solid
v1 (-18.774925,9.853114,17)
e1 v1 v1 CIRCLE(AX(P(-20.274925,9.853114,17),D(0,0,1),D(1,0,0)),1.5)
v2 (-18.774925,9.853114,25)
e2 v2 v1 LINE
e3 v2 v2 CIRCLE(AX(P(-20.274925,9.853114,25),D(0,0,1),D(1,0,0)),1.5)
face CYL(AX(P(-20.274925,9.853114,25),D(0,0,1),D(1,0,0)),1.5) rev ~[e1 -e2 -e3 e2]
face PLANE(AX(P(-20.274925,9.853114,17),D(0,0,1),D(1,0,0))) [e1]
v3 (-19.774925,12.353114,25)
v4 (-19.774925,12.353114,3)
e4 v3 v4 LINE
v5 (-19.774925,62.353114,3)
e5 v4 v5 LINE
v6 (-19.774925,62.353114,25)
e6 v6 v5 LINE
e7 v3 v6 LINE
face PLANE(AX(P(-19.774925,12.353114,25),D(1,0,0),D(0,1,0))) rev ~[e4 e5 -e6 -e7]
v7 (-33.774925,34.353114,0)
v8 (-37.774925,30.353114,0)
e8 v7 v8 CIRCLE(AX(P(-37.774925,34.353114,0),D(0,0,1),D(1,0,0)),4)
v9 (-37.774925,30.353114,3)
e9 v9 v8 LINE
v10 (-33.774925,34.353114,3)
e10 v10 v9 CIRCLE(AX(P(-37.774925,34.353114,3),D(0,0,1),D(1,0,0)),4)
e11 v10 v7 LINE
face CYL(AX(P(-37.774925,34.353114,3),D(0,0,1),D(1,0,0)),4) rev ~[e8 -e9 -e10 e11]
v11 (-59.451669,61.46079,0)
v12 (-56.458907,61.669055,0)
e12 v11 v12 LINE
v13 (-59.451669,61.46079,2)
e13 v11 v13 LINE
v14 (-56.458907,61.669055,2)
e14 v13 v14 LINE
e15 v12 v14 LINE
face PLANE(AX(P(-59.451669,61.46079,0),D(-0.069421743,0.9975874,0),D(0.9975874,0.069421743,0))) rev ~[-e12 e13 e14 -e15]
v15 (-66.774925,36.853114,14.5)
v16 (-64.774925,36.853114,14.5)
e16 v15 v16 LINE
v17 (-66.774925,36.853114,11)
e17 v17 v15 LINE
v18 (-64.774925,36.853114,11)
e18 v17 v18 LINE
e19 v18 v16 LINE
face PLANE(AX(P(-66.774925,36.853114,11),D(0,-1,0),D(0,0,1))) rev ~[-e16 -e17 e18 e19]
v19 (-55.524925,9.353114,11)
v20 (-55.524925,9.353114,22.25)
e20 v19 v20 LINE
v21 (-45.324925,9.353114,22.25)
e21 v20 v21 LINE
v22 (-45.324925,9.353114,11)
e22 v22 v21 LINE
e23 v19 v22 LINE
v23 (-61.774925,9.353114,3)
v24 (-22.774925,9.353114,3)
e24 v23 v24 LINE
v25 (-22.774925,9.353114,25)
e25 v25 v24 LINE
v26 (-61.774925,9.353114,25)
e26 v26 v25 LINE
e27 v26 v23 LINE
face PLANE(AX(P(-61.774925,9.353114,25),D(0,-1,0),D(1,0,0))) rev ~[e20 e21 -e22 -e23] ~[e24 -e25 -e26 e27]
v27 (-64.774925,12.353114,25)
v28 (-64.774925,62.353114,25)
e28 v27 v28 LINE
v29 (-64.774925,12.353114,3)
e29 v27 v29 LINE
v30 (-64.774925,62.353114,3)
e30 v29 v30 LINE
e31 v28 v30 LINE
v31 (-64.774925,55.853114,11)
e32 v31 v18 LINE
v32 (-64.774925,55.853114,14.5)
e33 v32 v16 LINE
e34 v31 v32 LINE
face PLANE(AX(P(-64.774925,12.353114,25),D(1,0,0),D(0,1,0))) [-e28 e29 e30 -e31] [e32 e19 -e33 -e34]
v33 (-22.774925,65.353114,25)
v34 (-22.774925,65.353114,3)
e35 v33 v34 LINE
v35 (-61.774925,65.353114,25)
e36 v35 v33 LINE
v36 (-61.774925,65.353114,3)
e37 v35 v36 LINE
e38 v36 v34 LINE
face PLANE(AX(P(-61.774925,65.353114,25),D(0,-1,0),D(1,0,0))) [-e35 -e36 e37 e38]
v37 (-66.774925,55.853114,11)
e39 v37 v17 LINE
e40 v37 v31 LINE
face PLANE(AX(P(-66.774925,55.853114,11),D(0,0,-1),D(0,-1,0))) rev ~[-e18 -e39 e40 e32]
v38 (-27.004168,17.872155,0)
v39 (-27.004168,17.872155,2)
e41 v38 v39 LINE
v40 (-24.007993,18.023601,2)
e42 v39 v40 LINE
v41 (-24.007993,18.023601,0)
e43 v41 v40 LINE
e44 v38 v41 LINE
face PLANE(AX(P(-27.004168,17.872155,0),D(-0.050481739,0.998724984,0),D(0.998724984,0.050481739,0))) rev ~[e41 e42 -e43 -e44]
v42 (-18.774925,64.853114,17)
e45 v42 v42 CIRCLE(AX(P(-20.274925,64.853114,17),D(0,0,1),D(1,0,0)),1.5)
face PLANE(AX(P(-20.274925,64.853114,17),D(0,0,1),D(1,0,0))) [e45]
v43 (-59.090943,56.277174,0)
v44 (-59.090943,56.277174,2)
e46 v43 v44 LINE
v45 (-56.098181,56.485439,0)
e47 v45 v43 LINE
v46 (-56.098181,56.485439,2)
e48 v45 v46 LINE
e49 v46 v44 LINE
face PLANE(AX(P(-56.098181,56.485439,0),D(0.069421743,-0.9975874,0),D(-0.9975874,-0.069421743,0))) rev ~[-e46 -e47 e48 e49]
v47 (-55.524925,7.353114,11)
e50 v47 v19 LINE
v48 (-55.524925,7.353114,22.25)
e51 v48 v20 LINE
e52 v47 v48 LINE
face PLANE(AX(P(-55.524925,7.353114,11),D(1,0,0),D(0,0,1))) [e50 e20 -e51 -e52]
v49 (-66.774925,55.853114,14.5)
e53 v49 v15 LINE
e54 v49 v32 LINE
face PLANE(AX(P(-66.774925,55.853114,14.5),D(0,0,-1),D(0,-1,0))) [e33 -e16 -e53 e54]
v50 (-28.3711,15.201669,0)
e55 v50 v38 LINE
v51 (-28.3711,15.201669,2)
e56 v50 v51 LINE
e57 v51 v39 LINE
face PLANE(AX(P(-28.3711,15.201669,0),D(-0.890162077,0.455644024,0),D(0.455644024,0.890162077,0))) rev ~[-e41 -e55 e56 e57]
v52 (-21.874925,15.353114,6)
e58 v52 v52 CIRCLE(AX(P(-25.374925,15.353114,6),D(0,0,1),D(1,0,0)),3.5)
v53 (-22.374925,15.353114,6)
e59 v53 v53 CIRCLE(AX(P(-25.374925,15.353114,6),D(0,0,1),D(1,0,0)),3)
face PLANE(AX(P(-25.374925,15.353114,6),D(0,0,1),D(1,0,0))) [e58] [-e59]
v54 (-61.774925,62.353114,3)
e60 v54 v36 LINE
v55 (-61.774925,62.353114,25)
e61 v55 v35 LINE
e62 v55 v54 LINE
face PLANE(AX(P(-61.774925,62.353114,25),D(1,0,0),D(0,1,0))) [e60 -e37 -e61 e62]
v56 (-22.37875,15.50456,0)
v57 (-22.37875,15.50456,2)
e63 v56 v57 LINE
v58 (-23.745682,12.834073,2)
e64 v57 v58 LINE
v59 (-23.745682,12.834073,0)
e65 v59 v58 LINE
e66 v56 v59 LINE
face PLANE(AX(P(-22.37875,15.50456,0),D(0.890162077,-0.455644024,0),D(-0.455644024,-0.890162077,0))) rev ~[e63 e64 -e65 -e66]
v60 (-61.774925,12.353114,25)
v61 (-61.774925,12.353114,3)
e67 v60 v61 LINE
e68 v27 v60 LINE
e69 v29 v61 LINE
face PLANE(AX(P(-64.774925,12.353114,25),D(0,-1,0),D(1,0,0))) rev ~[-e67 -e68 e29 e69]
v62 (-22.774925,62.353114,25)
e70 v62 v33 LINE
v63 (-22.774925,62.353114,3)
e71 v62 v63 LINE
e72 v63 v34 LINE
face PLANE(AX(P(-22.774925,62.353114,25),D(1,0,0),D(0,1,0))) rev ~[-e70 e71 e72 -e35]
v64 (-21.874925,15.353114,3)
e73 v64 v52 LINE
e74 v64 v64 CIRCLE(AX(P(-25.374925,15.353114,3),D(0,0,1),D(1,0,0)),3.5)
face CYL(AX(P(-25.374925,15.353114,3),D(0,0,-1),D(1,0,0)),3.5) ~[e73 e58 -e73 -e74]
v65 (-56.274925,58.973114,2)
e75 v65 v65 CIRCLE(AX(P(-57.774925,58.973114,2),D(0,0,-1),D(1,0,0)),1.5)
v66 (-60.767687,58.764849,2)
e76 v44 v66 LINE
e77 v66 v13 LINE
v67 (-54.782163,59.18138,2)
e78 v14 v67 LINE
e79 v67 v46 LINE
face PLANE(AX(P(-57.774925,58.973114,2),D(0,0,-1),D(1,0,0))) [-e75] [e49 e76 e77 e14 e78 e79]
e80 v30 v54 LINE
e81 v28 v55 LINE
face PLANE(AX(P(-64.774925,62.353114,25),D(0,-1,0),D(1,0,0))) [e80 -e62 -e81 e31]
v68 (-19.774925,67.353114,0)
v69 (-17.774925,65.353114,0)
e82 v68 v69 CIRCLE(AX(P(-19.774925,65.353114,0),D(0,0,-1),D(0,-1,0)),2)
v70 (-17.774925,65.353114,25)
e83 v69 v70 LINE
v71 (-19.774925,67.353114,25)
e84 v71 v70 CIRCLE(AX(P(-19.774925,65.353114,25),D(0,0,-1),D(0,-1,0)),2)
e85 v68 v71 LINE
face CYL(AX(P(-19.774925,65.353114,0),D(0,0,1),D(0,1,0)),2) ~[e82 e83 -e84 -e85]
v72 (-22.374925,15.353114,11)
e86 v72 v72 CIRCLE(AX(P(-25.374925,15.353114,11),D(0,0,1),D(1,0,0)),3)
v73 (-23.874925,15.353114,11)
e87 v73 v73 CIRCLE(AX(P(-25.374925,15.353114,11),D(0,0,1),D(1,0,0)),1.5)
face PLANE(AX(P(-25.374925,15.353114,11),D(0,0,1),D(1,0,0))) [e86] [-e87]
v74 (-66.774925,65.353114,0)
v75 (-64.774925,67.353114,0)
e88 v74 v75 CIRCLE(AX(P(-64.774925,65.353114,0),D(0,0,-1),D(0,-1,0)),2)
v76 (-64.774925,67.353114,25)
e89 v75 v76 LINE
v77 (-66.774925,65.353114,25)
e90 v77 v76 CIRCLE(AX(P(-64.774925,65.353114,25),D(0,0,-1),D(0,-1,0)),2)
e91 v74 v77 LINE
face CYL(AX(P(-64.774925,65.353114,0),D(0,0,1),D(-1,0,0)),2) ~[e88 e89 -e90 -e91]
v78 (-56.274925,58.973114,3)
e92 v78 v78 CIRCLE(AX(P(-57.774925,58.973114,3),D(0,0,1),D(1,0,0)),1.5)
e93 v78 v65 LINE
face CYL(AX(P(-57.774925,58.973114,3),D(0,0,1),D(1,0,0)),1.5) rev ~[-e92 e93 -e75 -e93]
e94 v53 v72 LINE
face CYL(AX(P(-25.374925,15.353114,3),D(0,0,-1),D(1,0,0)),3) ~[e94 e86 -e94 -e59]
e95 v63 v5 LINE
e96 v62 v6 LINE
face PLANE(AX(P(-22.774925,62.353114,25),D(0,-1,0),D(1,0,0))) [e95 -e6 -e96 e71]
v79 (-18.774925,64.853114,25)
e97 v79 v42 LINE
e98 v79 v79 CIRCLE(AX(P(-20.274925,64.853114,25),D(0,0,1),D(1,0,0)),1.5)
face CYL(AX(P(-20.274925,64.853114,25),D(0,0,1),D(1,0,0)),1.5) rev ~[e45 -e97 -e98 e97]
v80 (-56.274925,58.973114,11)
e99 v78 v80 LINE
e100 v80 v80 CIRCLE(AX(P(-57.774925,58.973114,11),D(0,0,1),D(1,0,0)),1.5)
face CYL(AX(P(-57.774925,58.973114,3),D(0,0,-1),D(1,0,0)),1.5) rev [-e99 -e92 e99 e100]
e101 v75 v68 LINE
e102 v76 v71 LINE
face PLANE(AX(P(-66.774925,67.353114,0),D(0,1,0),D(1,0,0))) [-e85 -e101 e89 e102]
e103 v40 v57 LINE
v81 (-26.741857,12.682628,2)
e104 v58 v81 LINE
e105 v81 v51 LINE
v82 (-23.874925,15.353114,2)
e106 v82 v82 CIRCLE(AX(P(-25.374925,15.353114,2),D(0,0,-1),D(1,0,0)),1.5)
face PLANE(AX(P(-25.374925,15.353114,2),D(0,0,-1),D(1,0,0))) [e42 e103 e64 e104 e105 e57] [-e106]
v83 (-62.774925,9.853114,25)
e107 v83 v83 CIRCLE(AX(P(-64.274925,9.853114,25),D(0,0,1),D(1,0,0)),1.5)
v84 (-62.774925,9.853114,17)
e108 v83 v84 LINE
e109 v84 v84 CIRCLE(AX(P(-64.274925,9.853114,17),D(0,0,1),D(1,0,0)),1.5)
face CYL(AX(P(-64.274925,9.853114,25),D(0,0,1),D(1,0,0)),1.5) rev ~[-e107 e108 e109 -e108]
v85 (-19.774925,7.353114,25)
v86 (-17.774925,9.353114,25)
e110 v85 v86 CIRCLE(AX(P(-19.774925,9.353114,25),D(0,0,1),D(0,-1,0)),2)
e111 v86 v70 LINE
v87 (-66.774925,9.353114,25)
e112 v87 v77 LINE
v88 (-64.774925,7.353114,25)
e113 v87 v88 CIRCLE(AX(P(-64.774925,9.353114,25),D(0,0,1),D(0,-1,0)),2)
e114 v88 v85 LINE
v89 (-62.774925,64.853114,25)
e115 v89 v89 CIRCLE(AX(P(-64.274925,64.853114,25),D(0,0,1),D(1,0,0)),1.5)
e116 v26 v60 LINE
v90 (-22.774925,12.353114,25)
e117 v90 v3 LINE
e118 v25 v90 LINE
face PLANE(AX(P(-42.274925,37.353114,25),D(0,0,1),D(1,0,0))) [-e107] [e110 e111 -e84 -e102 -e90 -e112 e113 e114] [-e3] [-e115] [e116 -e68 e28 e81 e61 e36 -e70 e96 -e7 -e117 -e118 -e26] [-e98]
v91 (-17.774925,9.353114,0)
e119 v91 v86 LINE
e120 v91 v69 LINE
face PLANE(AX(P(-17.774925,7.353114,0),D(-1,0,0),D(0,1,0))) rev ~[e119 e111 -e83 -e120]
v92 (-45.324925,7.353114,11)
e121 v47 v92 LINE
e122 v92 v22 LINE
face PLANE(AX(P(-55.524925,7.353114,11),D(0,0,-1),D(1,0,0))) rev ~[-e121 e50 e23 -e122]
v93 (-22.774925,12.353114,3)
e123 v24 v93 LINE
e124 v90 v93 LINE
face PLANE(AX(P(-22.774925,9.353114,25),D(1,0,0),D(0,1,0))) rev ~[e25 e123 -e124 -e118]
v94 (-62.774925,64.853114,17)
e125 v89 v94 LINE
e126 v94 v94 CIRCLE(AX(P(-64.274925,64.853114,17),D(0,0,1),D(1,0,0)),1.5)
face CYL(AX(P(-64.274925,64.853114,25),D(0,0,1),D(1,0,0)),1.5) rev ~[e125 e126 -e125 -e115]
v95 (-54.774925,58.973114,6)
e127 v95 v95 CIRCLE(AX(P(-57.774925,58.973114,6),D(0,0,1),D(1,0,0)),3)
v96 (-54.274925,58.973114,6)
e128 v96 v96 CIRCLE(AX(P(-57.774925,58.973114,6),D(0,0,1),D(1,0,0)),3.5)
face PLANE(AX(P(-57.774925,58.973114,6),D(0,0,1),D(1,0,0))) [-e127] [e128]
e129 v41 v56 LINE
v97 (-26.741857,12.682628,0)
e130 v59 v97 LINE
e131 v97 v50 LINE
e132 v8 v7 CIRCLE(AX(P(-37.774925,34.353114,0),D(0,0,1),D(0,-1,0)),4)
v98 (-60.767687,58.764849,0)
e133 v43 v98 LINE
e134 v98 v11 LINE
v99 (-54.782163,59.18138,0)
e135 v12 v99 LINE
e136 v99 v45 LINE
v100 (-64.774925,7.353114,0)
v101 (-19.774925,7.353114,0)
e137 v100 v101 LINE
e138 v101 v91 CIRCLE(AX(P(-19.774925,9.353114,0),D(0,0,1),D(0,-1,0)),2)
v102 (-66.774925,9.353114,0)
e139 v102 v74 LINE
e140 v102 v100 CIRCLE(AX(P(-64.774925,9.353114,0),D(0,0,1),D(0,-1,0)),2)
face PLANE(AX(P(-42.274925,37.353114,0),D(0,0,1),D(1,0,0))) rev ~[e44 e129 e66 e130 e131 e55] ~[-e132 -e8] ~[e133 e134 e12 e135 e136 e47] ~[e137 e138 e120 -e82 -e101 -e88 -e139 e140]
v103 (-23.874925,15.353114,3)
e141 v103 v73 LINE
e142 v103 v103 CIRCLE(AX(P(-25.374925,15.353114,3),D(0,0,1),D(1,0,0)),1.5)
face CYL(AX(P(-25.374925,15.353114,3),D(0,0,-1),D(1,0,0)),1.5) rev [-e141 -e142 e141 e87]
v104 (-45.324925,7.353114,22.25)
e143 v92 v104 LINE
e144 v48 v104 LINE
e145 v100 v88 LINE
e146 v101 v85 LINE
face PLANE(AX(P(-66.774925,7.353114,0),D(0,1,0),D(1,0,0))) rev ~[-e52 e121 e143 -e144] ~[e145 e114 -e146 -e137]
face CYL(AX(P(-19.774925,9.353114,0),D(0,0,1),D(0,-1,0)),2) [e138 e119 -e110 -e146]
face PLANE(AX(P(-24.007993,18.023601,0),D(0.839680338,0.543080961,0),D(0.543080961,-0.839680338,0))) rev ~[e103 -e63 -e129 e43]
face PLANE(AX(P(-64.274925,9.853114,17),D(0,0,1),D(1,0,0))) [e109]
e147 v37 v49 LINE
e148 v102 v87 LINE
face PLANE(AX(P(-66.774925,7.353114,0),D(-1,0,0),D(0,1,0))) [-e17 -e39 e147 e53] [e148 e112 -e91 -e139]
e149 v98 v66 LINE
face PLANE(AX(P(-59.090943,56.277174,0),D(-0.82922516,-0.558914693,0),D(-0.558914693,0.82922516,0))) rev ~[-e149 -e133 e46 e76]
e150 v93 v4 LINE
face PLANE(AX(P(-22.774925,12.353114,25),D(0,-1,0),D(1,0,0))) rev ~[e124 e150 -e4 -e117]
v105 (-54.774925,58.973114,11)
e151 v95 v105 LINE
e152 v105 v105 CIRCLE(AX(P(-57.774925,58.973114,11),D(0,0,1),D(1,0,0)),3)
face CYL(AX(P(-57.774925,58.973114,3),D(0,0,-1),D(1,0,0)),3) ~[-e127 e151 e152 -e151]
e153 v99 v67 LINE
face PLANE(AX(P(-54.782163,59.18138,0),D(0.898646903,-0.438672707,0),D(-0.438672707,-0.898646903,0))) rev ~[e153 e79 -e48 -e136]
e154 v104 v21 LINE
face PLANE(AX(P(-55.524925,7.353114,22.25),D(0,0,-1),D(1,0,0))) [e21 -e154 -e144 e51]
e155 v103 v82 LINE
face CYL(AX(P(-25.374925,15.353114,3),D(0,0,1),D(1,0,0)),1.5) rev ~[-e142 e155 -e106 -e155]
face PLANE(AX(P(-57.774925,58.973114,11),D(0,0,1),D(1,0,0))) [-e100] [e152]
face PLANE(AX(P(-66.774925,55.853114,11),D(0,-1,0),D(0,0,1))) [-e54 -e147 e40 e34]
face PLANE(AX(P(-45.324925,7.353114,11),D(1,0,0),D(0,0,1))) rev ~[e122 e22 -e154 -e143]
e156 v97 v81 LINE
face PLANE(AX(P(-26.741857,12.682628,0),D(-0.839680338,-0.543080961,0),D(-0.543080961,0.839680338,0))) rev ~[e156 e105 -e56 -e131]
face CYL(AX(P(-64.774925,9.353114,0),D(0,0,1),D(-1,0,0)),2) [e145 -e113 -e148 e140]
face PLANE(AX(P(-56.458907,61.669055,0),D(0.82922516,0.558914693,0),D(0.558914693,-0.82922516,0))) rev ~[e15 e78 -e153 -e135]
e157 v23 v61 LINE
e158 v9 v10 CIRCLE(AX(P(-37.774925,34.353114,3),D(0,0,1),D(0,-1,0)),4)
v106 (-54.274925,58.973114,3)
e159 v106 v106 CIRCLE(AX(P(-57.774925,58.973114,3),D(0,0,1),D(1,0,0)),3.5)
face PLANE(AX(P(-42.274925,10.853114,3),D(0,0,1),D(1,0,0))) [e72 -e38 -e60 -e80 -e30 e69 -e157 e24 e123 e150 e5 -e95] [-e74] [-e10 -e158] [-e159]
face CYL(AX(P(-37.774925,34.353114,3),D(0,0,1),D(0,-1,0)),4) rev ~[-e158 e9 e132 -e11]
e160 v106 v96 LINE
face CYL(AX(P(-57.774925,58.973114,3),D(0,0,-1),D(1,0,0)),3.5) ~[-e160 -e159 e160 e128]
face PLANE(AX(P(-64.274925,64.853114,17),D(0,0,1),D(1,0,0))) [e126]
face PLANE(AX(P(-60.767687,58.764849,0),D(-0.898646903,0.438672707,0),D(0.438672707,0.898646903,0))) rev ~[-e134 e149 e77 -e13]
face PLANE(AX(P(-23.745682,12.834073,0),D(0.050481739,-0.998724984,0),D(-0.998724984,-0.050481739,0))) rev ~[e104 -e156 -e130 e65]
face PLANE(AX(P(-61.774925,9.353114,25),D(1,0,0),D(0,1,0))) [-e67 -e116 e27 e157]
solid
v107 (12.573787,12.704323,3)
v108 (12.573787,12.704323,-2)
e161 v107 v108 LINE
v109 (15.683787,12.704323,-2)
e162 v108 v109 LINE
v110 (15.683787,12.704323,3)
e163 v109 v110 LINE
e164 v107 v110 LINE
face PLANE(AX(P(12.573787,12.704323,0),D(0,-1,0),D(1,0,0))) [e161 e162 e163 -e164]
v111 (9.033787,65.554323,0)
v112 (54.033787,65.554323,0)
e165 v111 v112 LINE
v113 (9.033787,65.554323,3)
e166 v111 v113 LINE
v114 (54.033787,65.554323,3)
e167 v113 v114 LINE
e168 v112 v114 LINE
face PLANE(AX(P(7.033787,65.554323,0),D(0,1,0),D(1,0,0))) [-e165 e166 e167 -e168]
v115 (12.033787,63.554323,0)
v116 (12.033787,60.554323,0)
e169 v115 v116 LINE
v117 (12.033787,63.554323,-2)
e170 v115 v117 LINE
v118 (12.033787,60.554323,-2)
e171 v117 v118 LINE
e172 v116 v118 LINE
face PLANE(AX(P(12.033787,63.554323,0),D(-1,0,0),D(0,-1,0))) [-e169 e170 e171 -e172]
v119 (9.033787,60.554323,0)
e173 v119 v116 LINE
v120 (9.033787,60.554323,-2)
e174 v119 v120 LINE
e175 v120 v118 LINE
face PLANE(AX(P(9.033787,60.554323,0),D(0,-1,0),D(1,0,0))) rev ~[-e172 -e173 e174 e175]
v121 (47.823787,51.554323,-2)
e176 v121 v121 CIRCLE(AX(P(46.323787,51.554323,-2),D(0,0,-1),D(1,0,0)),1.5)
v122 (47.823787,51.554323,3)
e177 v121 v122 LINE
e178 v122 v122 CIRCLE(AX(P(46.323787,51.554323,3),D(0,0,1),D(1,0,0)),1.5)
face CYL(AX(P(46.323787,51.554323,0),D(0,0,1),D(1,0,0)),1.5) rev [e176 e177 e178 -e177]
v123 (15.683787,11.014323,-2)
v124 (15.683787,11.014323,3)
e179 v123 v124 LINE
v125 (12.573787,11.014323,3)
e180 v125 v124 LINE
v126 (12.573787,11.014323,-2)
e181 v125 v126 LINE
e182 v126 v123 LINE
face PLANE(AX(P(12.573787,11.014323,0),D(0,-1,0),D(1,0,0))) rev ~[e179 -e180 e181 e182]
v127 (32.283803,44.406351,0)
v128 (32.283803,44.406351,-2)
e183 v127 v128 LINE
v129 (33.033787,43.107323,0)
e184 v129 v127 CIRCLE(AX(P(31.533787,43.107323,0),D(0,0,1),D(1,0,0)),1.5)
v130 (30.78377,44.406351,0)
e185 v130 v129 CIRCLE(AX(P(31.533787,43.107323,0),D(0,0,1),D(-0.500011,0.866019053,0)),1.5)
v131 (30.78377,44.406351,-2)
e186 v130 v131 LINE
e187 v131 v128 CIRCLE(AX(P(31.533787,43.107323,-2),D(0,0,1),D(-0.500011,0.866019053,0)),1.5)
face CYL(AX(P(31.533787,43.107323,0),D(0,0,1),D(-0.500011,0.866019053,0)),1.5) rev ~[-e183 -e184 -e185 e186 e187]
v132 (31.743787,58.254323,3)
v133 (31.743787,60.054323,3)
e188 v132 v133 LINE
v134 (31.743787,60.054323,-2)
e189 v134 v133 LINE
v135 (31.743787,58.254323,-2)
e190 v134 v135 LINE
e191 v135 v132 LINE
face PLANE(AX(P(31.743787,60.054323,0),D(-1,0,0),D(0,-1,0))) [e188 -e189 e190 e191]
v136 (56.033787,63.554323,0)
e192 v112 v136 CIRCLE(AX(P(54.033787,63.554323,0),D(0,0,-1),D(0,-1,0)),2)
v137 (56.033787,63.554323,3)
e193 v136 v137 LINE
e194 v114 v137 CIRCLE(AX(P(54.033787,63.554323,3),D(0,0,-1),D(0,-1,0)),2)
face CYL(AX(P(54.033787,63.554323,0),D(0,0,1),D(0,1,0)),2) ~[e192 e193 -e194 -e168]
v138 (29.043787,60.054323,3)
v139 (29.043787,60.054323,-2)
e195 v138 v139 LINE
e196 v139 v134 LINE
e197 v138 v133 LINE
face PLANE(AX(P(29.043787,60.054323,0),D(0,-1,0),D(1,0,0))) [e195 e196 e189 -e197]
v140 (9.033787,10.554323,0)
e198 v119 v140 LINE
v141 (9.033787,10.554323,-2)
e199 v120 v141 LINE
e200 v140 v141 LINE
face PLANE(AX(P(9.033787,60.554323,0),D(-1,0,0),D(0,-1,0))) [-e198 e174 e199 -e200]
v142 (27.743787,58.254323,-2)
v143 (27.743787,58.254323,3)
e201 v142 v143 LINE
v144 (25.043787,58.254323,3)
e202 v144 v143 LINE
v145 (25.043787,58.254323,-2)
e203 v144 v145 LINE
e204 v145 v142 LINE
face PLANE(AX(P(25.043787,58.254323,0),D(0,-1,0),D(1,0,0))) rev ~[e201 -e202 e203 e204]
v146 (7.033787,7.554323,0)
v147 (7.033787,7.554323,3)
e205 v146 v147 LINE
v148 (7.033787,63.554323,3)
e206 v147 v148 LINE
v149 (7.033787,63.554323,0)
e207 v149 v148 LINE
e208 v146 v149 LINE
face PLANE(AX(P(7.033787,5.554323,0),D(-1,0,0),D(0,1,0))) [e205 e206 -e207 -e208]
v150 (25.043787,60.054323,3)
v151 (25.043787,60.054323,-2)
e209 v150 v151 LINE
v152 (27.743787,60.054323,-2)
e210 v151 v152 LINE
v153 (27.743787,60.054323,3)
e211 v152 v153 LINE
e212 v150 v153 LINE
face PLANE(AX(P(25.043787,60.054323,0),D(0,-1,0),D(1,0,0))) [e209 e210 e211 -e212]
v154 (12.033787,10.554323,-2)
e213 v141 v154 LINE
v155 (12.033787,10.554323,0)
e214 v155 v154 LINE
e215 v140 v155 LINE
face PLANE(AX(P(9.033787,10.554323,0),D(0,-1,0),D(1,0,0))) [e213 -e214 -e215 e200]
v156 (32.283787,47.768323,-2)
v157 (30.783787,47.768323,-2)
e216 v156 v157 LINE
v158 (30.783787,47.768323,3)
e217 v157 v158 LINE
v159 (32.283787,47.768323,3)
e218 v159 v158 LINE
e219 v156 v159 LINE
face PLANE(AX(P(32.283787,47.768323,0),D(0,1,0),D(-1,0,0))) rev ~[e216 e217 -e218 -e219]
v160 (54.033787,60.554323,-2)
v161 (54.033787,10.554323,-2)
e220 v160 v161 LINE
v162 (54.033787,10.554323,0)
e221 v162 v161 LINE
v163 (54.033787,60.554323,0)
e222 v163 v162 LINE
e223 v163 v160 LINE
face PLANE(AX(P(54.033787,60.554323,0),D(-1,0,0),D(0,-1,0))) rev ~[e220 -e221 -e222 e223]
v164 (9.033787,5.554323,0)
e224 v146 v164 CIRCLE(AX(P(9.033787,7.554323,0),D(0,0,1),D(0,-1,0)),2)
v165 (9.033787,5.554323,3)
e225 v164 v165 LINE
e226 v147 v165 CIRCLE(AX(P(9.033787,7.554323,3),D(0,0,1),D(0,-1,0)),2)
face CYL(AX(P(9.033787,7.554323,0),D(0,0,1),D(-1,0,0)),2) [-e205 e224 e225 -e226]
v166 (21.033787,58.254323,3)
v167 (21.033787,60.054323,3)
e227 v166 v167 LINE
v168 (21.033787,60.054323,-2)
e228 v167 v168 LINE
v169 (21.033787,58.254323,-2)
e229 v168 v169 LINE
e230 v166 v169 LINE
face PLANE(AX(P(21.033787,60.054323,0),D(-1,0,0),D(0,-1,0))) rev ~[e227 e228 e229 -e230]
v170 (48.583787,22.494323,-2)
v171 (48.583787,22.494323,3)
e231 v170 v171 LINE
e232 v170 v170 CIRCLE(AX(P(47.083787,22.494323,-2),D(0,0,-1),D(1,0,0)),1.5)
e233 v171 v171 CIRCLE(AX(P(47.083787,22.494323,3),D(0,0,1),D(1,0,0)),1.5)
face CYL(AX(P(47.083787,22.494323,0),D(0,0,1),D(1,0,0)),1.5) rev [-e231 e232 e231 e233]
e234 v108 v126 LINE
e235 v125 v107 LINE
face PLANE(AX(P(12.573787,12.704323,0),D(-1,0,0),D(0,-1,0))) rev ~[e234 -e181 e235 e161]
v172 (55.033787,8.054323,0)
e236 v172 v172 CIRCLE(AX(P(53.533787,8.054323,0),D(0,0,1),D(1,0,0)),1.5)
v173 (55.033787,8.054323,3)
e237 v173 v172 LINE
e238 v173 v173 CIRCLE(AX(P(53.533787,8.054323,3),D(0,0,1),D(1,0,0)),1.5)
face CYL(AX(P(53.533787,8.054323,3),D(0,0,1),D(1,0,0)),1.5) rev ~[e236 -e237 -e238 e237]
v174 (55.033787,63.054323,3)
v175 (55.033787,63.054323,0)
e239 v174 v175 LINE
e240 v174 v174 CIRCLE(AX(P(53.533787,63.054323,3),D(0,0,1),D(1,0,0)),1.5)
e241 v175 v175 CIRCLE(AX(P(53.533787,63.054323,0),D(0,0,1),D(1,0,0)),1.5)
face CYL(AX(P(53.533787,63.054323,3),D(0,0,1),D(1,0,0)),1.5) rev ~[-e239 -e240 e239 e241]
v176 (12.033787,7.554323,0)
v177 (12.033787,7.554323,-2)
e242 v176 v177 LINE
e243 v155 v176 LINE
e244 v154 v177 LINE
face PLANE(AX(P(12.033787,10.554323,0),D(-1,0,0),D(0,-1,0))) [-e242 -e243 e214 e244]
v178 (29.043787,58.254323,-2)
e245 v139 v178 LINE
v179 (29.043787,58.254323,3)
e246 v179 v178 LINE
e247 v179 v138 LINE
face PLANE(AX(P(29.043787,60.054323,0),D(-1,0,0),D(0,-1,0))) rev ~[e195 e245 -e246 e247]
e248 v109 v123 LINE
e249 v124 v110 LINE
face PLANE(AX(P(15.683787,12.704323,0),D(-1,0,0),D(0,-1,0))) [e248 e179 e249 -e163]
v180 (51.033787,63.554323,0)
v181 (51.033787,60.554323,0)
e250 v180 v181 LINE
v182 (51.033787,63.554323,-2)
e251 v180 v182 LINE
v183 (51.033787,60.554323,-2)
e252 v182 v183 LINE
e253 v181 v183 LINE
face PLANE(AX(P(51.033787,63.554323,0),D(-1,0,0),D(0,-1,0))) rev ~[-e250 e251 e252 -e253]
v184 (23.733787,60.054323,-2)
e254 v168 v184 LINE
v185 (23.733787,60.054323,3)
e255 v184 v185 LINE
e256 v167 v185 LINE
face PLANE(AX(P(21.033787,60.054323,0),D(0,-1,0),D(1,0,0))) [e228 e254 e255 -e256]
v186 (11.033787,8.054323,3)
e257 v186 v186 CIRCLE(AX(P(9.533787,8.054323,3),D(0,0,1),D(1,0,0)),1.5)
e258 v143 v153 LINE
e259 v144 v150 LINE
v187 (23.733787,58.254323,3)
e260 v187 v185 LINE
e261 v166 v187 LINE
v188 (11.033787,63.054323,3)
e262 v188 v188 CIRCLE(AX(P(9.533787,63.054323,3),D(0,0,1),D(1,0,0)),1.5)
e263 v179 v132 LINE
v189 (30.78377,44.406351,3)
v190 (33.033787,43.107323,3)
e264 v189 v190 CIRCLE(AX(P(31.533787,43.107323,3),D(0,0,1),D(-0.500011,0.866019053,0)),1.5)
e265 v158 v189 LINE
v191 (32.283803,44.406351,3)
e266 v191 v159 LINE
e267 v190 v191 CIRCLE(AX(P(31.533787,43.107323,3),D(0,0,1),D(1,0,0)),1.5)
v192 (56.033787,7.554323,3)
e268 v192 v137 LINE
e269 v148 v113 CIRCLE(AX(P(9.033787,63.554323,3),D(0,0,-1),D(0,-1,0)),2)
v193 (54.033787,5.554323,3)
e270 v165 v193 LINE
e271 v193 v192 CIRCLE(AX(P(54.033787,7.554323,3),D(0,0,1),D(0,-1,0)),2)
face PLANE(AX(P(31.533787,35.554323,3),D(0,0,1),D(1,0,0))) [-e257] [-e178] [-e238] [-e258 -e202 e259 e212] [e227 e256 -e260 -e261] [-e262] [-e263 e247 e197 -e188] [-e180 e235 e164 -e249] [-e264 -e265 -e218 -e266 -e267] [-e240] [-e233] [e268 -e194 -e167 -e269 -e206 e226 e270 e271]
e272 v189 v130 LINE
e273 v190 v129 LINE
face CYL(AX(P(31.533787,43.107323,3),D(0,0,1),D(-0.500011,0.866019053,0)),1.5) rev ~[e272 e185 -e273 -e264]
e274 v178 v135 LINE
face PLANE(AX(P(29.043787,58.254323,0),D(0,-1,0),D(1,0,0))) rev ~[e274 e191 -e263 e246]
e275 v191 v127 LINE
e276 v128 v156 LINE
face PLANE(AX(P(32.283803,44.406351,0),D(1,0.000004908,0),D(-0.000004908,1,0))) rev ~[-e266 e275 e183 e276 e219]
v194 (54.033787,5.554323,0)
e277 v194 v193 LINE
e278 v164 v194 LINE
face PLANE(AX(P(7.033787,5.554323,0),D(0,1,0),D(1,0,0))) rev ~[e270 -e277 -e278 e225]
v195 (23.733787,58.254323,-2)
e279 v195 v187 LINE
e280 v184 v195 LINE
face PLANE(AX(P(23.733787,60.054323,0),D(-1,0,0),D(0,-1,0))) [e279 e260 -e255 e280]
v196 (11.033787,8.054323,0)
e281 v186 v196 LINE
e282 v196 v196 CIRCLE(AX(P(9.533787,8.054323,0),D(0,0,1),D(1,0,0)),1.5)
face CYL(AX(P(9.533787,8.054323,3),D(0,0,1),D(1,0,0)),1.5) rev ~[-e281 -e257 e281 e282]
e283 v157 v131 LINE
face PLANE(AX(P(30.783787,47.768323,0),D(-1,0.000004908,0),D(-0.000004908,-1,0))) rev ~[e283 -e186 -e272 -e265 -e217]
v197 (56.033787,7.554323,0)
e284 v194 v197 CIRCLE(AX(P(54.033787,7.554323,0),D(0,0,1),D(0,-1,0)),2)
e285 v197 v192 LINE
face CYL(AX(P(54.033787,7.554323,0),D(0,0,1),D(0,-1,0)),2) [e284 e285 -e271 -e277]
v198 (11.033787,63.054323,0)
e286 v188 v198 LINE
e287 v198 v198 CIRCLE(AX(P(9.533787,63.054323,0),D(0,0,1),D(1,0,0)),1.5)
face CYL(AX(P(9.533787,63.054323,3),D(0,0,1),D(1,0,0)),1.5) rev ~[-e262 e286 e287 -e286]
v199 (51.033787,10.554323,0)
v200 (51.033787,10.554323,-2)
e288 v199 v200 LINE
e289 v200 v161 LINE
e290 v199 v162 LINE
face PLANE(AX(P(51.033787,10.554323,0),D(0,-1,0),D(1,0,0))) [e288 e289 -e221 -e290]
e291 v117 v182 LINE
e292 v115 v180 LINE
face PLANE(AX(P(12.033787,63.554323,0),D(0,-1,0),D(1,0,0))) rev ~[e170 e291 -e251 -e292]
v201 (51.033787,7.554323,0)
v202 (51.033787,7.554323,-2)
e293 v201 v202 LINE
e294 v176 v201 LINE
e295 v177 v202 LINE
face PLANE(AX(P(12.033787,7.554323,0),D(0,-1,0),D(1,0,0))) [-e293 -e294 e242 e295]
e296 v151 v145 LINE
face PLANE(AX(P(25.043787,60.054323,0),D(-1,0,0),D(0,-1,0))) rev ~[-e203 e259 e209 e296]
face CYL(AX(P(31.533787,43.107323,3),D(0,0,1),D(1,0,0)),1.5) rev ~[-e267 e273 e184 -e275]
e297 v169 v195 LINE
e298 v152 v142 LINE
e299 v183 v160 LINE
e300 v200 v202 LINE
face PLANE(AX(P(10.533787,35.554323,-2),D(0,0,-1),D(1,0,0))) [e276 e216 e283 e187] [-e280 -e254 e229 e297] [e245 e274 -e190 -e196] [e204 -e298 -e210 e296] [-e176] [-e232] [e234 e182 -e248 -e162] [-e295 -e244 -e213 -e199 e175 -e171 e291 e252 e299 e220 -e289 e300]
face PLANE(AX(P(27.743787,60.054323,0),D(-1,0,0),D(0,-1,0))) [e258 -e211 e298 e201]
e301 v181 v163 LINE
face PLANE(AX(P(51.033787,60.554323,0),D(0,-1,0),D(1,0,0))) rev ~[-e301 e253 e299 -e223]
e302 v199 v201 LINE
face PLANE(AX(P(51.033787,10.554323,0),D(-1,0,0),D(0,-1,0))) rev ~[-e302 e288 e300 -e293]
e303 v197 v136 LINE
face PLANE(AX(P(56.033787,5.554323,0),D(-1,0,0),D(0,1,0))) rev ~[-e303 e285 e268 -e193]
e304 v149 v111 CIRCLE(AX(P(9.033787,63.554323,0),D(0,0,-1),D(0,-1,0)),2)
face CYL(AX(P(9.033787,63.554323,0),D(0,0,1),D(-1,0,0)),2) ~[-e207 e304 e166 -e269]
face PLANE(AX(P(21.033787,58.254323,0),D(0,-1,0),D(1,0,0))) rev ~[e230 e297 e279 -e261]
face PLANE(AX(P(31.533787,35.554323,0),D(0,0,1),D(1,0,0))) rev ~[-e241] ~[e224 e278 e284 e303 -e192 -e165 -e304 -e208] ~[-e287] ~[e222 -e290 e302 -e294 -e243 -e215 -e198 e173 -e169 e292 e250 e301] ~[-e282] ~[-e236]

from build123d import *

# Parameters (mm, degrees)
F0_W      = 49
F0_H      = 60
F1_DEPTH  = 25
F2_W      = 39
F2_H      = 50
F3_DEPTH  = 22
F4_R      = 1.5
F5_DEPTH  = 8
F6_W      = 39
F6_H      = 3
F6_W_2    = 3
F6_H_2    = 50
F7_DEPTH  = 22
F8_R      = 3
F8_R_2    = 1.5
F9_DEPTH  = 8
F10_DEPTH = 11
F11_W     = 49
F11_H     = 60
F12_DEPTH = 3
F13_R     = 1.5
F14_DEPTH = 3
F15_W     = 10.2
F15_H     = 11.25
F16_DEPTH = 2
F17_W     = 19
F17_H     = 3.5
F18_DEPTH = 2
F19_R     = 3.5
F19_R_2   = 3
F20_DEPTH = 3
F21_R     = 1.5
F22_DEPTH = 2
F24_DEPTH = 3
F25_W     = 2.7
F25_H     = 1.8
F25_R     = 1.5
F25_W_2   = 3.11
F25_H_2   = 1.69
F26_DEPTH = 5
F28_DEPTH = 5
F29_R     = 2
F29_2_R   = 2
F30_W     = 39
F30_H     = 50
F30_W_2   = 2.7
F30_H_2   = 1.8
F30_R     = 1.5
F30_W_3   = 3.11
F30_H_3   = 1.69
F31_DEPTH = 2
F32_W     = 3
F32_H     = 50
F32_W_2   = 39
F32_H_2   = 3
F33_DEPTH = 2


# Not quite as in the source:
# - ends of sketch curves that miss each other by under 0.0002 mm in the source are joined
# - a feature names something its author has since deleted; it is built from what else it names


with BuildPart() as f1:
    # F0 (on Top) → F1 (new body)
    with BuildSketch(Plane.XY):
        with Locations((-42.2749249265, 37.3531144334)):
            Rectangle(F0_W, F0_H)
    extrude(amount=F1_DEPTH)

    # F2 (on face) → F3 (cut)
    with BuildSketch(Plane.XY.offset(25)):
        with Locations((-42.2749249265, 37.3531144334)):
            Rectangle(F2_W, F2_H)
    extrude(amount=-F3_DEPTH, mode=Mode.SUBTRACT)

    # F4 (on face) → F5 (cut)
    with BuildSketch(Plane.XY.offset(25)):
        with Locations((-20.2749249265, 64.8531144334)):
            Circle(F4_R)
        with Locations((-20.2749249265, 9.8531144334)):
            Circle(F4_R)
        with Locations((-64.2749249265, 9.8531144334)):
            Circle(F4_R)
        with Locations((-64.2749249265, 64.8531144334)):
            Circle(F4_R)
    extrude(amount=-F5_DEPTH, mode=Mode.SUBTRACT)

    # F6 (on face) → F7 (cut)
    with BuildSketch(Plane.XY.offset(25)):
        with Locations((-42.2749249265, 63.8531144334)):
            Rectangle(F6_W, F6_H)
        with Locations((-63.2749249265, 37.3531144334)):
            Rectangle(F6_W_2, F6_H_2)
        with Locations((-42.2749249265, 10.8531144334)):
            Rectangle(F6_W, F6_H)
        with Locations((-21.2749249265, 37.3531144334)):
            Rectangle(F6_W_2, F6_H_2)
    extrude(amount=-F7_DEPTH, mode=Mode.SUBTRACT)

    # F8 (on face) → F9 (join)
    with BuildSketch(Plane.XY.offset(3)):
        with Locations((-57.7749249265, 58.9731144334)):
            Circle(F8_R)
        with Locations((-57.7749249265, 58.9731144334)):
            Circle(F8_R_2, mode=Mode.SUBTRACT)
        with Locations((-25.3749249265, 15.3531144334)):
            Circle(F8_R)
        with Locations((-25.3749249265, 15.3531144334)):
            Circle(F8_R_2, mode=Mode.SUBTRACT)
    extrude(amount=F9_DEPTH)

    # F10 (cut): faces of the model
    f10_faces = [f1.faces().sort_by_distance(p)[0] for p in [
        (-25.3749249265, 15.3531144334, 3),
        (-57.7749249265, 58.9731144334, 3),
    ]]
    extrude(f10_faces, amount=-F10_DEPTH, mode=Mode.SUBTRACT)

    # F15 (on face) → F16 (cut)
    with BuildSketch(Plane.XZ.offset(-7.3531144334)):
        with Locations((-50.4249249265, 16.625)):
            Rectangle(F15_W, F15_H)
    extrude(amount=-F16_DEPTH, mode=Mode.SUBTRACT)

    # F17 (on face) → F18 (cut)
    with BuildSketch(Plane(origin=(-66.7749249265, 0, 0), x_dir=(0, -1, 0), z_dir=(-1, 0, 0))):
        with Locations((-46.3531144334, 12.75)):
            Rectangle(F17_W, F17_H)
    extrude(amount=-F18_DEPTH, mode=Mode.SUBTRACT)

    # F19 (on face) → F20 (join)
    with BuildSketch(Plane.XY.offset(3)):
        with Locations((-57.7749249265, 58.9731144334)):
            Circle(F19_R)
        with Locations((-57.7749249265, 58.9731144334)):
            Circle(F19_R_2, mode=Mode.SUBTRACT)
        with Locations((-25.3749249265, 15.3531144334)):
            Circle(F19_R)
        with Locations((-25.3749249265, 15.3531144334)):
            Circle(F19_R_2, mode=Mode.SUBTRACT)
    extrude(amount=F20_DEPTH)

    # F21 (on face) → F22 (cut)
    with BuildSketch(Plane(origin=(0, 0, 0), x_dir=(1, 0, 0), z_dir=(0, 0, -1))):
        Polygon((-54.782162725, -59.1813796625), (-56.0981808467, -56.485438954), (-59.0909430481, -56.277173725), (-60.7676871279, -58.7648492044), (-59.4516690063, -61.4607899128), (-56.4589068048, -61.6690551419), align=None)
        with Locations((-57.7749249265, -58.9731144334)):
            Circle(F21_R, mode=Mode.SUBTRACT)
        Polygon((-22.3787499739, -15.5045596509), (-23.7456820446, -12.8340734191), (-26.7418569971, -12.6826282016), (-28.371099879, -15.201669216), (-27.0041678083, -17.8721554478), (-24.0079928558, -18.0236006652), align=None)
        with Locations((-25.3749249265, -15.3531144334)):
            Circle(F21_R, mode=Mode.SUBTRACT)
    extrude(amount=-F22_DEPTH, mode=Mode.SUBTRACT)

    # F23 (on face) → F24 (cut)
    with BuildSketch(Plane.XY.offset(3)):
        with BuildLine():
            Line((-37.7749249265, 34.3531144334), (-33.7749249265, 34.3531144334))
            ThreePointArc((-33.7749249265, 34.3531144334), (-40.6033520512, 37.1815415582), (-37.7749249265, 30.3531144334))
            Line((-37.7749249265, 30.3531144334), (-37.7749249265, 34.3531144334))
        make_face()
        with BuildLine():
            ThreePointArc((-37.7749249265, 30.3531144334), (-34.9464978017, 31.5246873087), (-33.7749249265, 34.3531144334))
            Line((-33.7749249265, 34.3531144334), (-37.7749249265, 34.3531144334))
            Line((-37.7749249265, 34.3531144334), (-37.7749249265, 30.3531144334))
        make_face()
    extrude(amount=-F24_DEPTH, mode=Mode.SUBTRACT)

    # F29
    f29_edges = [f1.edges().sort_by_distance(p)[0] for p in [
        (-17.774925, 67.353114, 12.5),
        (-17.774925, 7.353114, 12.5),
        (-66.774925, 7.353114, 12.5),
        (-66.774925, 67.353114, 12.5),
    ]]
    fillet(f29_edges, radius=F29_R)


with BuildPart() as f12:
    # F11 (on Top) → F12 (new body)
    with BuildSketch(Plane.XY):
        with Locations((31.5337867644, 35.5543226007)):
            Rectangle(F11_W, F11_H)
    extrude(amount=F12_DEPTH)

    # F13 (on face) → F14 (cut)
    with BuildSketch(Plane.XY.offset(3)):
        with Locations((9.5337867644, 63.0543226007)):
            Circle(F13_R)
        with Locations((53.5337867644, 63.0543226007)):
            Circle(F13_R)
        with Locations((53.5337867644, 8.0543226007)):
            Circle(F13_R)
        with Locations((9.5337867644, 8.0543226007)):
            Circle(F13_R)
    extrude(amount=-F14_DEPTH, mode=Mode.SUBTRACT)

    # F25 (on face) → F26 (cut)
    with BuildSketch(Plane.XY.offset(3)):
        with Locations((22.3837867644, 59.1543226007)):
            Rectangle(F25_W, F25_H)
        with Locations((26.3937867644, 59.1543226007)):
            Rectangle(F25_W, F25_H)
        with Locations((30.3937867644, 59.1543226007)):
            Rectangle(F25_W, F25_H)
        with Locations((46.3237867644, 51.5543226007)):
            Circle(F25_R)
        with Locations((47.0837867644, 22.4943226007)):
            Circle(F25_R)
        with Locations((14.1287867644, 11.8593226007)):
            Rectangle(F25_W_2, F25_H_2)
    extrude(amount=-F26_DEPTH, mode=Mode.SUBTRACT)

    # F27 (on face) → F28 (cut)
    with BuildSketch(Plane.XY.offset(3)):
        with BuildLine():
            ThreePointArc((30.7837702638, 44.4063511796), (31.5337867644, 44.6073226007), (32.2838032649, 44.4063511796))
            Line((32.2838032649, 44.4063511796), (32.2837867644, 47.7683226007))
            Line((32.2837867644, 47.7683226007), (30.7837867644, 47.7683226007))
            Line((30.7837867644, 47.7683226007), (30.7837702638, 44.4063511796))
        make_face()
        with BuildLine():
            ThreePointArc((30.7837702638, 44.4063511796), (30.7837950147, 41.8082797317), (33.0337867644, 43.1073226007))
            ThreePointArc((33.0337867644, 43.1073226007), (32.8328296333, 43.8573143503), (32.2838032649, 44.4063511796))
            ThreePointArc((32.2838032649, 44.4063511796), (31.5337867644, 44.6073226007), (30.7837702638, 44.4063511796))
        make_face()
    extrude(amount=-F28_DEPTH, mode=Mode.SUBTRACT)

    # F29#2
    f29_2_edges = [f12.edges().sort_by_distance(p)[0] for p in [
        (56.033787, 65.554323, 1.5),
        (56.033787, 5.554323, 1.5),
        (7.033787, 65.554323, 1.5),
        (7.033787, 5.554323, 1.5),
    ]]
    fillet(f29_2_edges, radius=F29_2_R)

    # F30 (on face) → F31 (join)
    with BuildSketch(Plane(origin=(0, 0, 0), x_dir=(1, 0, 0), z_dir=(0, 0, -1))):
        with Locations((31.5337867644, -35.5543226007)):
            Rectangle(F30_W, F30_H)
        with Locations((22.3837867644, -59.1543226007)):
            Rectangle(F30_W_2, F30_H_2, mode=Mode.SUBTRACT)
        with Locations((26.3937867644, -59.1543226007)):
            Rectangle(F30_W_2, F30_H_2, mode=Mode.SUBTRACT)
        with Locations((30.3937867644, -59.1543226007)):
            Rectangle(F30_W_2, F30_H_2, mode=Mode.SUBTRACT)
        with Locations((46.3237867644, -51.5543226007)):
            Circle(F30_R, mode=Mode.SUBTRACT)
        with BuildLine():
            ThreePointArc((30.7837702638, -44.4063511796), (31.5337867644, -41.6073226007), (32.2838032649, -44.4063511796))
            Line((32.2838032649, -44.4063511796), (32.2837867644, -47.7683226007))
            Line((32.2837867644, -47.7683226007), (30.7837867644, -47.7683226007))
            Line((30.7837867644, -47.7683226007), (30.7837702638, -44.4063511796))
        make_face(mode=Mode.SUBTRACT)
        with Locations((14.1287867644, -11.8593226007)):
            Rectangle(F30_W_3, F30_H_3, mode=Mode.SUBTRACT)
        with Locations((47.0837867644, -22.4943226007)):
            Circle(F30_R, mode=Mode.SUBTRACT)
    extrude(amount=F31_DEPTH)

    # F32 (on face) → F33 (join)
    with BuildSketch(Plane(origin=(0, 0, 0), x_dir=(1, 0, 0), z_dir=(0, 0, -1))):
        with Locations((10.5337867644, -35.5543226007)):
            Rectangle(F32_W, F32_H)
        with Locations((31.5337867644, -9.0543226007)):
            Rectangle(F32_W_2, F32_H_2)
        with Locations((52.5337867644, -35.5543226007)):
            Rectangle(F32_W, F32_H)
        with Locations((31.5337867644, -62.0543226007)):
            Rectangle(F32_W_2, F32_H_2)
    extrude(amount=F33_DEPTH)


solid = Compound([f1.part, f12.part])
